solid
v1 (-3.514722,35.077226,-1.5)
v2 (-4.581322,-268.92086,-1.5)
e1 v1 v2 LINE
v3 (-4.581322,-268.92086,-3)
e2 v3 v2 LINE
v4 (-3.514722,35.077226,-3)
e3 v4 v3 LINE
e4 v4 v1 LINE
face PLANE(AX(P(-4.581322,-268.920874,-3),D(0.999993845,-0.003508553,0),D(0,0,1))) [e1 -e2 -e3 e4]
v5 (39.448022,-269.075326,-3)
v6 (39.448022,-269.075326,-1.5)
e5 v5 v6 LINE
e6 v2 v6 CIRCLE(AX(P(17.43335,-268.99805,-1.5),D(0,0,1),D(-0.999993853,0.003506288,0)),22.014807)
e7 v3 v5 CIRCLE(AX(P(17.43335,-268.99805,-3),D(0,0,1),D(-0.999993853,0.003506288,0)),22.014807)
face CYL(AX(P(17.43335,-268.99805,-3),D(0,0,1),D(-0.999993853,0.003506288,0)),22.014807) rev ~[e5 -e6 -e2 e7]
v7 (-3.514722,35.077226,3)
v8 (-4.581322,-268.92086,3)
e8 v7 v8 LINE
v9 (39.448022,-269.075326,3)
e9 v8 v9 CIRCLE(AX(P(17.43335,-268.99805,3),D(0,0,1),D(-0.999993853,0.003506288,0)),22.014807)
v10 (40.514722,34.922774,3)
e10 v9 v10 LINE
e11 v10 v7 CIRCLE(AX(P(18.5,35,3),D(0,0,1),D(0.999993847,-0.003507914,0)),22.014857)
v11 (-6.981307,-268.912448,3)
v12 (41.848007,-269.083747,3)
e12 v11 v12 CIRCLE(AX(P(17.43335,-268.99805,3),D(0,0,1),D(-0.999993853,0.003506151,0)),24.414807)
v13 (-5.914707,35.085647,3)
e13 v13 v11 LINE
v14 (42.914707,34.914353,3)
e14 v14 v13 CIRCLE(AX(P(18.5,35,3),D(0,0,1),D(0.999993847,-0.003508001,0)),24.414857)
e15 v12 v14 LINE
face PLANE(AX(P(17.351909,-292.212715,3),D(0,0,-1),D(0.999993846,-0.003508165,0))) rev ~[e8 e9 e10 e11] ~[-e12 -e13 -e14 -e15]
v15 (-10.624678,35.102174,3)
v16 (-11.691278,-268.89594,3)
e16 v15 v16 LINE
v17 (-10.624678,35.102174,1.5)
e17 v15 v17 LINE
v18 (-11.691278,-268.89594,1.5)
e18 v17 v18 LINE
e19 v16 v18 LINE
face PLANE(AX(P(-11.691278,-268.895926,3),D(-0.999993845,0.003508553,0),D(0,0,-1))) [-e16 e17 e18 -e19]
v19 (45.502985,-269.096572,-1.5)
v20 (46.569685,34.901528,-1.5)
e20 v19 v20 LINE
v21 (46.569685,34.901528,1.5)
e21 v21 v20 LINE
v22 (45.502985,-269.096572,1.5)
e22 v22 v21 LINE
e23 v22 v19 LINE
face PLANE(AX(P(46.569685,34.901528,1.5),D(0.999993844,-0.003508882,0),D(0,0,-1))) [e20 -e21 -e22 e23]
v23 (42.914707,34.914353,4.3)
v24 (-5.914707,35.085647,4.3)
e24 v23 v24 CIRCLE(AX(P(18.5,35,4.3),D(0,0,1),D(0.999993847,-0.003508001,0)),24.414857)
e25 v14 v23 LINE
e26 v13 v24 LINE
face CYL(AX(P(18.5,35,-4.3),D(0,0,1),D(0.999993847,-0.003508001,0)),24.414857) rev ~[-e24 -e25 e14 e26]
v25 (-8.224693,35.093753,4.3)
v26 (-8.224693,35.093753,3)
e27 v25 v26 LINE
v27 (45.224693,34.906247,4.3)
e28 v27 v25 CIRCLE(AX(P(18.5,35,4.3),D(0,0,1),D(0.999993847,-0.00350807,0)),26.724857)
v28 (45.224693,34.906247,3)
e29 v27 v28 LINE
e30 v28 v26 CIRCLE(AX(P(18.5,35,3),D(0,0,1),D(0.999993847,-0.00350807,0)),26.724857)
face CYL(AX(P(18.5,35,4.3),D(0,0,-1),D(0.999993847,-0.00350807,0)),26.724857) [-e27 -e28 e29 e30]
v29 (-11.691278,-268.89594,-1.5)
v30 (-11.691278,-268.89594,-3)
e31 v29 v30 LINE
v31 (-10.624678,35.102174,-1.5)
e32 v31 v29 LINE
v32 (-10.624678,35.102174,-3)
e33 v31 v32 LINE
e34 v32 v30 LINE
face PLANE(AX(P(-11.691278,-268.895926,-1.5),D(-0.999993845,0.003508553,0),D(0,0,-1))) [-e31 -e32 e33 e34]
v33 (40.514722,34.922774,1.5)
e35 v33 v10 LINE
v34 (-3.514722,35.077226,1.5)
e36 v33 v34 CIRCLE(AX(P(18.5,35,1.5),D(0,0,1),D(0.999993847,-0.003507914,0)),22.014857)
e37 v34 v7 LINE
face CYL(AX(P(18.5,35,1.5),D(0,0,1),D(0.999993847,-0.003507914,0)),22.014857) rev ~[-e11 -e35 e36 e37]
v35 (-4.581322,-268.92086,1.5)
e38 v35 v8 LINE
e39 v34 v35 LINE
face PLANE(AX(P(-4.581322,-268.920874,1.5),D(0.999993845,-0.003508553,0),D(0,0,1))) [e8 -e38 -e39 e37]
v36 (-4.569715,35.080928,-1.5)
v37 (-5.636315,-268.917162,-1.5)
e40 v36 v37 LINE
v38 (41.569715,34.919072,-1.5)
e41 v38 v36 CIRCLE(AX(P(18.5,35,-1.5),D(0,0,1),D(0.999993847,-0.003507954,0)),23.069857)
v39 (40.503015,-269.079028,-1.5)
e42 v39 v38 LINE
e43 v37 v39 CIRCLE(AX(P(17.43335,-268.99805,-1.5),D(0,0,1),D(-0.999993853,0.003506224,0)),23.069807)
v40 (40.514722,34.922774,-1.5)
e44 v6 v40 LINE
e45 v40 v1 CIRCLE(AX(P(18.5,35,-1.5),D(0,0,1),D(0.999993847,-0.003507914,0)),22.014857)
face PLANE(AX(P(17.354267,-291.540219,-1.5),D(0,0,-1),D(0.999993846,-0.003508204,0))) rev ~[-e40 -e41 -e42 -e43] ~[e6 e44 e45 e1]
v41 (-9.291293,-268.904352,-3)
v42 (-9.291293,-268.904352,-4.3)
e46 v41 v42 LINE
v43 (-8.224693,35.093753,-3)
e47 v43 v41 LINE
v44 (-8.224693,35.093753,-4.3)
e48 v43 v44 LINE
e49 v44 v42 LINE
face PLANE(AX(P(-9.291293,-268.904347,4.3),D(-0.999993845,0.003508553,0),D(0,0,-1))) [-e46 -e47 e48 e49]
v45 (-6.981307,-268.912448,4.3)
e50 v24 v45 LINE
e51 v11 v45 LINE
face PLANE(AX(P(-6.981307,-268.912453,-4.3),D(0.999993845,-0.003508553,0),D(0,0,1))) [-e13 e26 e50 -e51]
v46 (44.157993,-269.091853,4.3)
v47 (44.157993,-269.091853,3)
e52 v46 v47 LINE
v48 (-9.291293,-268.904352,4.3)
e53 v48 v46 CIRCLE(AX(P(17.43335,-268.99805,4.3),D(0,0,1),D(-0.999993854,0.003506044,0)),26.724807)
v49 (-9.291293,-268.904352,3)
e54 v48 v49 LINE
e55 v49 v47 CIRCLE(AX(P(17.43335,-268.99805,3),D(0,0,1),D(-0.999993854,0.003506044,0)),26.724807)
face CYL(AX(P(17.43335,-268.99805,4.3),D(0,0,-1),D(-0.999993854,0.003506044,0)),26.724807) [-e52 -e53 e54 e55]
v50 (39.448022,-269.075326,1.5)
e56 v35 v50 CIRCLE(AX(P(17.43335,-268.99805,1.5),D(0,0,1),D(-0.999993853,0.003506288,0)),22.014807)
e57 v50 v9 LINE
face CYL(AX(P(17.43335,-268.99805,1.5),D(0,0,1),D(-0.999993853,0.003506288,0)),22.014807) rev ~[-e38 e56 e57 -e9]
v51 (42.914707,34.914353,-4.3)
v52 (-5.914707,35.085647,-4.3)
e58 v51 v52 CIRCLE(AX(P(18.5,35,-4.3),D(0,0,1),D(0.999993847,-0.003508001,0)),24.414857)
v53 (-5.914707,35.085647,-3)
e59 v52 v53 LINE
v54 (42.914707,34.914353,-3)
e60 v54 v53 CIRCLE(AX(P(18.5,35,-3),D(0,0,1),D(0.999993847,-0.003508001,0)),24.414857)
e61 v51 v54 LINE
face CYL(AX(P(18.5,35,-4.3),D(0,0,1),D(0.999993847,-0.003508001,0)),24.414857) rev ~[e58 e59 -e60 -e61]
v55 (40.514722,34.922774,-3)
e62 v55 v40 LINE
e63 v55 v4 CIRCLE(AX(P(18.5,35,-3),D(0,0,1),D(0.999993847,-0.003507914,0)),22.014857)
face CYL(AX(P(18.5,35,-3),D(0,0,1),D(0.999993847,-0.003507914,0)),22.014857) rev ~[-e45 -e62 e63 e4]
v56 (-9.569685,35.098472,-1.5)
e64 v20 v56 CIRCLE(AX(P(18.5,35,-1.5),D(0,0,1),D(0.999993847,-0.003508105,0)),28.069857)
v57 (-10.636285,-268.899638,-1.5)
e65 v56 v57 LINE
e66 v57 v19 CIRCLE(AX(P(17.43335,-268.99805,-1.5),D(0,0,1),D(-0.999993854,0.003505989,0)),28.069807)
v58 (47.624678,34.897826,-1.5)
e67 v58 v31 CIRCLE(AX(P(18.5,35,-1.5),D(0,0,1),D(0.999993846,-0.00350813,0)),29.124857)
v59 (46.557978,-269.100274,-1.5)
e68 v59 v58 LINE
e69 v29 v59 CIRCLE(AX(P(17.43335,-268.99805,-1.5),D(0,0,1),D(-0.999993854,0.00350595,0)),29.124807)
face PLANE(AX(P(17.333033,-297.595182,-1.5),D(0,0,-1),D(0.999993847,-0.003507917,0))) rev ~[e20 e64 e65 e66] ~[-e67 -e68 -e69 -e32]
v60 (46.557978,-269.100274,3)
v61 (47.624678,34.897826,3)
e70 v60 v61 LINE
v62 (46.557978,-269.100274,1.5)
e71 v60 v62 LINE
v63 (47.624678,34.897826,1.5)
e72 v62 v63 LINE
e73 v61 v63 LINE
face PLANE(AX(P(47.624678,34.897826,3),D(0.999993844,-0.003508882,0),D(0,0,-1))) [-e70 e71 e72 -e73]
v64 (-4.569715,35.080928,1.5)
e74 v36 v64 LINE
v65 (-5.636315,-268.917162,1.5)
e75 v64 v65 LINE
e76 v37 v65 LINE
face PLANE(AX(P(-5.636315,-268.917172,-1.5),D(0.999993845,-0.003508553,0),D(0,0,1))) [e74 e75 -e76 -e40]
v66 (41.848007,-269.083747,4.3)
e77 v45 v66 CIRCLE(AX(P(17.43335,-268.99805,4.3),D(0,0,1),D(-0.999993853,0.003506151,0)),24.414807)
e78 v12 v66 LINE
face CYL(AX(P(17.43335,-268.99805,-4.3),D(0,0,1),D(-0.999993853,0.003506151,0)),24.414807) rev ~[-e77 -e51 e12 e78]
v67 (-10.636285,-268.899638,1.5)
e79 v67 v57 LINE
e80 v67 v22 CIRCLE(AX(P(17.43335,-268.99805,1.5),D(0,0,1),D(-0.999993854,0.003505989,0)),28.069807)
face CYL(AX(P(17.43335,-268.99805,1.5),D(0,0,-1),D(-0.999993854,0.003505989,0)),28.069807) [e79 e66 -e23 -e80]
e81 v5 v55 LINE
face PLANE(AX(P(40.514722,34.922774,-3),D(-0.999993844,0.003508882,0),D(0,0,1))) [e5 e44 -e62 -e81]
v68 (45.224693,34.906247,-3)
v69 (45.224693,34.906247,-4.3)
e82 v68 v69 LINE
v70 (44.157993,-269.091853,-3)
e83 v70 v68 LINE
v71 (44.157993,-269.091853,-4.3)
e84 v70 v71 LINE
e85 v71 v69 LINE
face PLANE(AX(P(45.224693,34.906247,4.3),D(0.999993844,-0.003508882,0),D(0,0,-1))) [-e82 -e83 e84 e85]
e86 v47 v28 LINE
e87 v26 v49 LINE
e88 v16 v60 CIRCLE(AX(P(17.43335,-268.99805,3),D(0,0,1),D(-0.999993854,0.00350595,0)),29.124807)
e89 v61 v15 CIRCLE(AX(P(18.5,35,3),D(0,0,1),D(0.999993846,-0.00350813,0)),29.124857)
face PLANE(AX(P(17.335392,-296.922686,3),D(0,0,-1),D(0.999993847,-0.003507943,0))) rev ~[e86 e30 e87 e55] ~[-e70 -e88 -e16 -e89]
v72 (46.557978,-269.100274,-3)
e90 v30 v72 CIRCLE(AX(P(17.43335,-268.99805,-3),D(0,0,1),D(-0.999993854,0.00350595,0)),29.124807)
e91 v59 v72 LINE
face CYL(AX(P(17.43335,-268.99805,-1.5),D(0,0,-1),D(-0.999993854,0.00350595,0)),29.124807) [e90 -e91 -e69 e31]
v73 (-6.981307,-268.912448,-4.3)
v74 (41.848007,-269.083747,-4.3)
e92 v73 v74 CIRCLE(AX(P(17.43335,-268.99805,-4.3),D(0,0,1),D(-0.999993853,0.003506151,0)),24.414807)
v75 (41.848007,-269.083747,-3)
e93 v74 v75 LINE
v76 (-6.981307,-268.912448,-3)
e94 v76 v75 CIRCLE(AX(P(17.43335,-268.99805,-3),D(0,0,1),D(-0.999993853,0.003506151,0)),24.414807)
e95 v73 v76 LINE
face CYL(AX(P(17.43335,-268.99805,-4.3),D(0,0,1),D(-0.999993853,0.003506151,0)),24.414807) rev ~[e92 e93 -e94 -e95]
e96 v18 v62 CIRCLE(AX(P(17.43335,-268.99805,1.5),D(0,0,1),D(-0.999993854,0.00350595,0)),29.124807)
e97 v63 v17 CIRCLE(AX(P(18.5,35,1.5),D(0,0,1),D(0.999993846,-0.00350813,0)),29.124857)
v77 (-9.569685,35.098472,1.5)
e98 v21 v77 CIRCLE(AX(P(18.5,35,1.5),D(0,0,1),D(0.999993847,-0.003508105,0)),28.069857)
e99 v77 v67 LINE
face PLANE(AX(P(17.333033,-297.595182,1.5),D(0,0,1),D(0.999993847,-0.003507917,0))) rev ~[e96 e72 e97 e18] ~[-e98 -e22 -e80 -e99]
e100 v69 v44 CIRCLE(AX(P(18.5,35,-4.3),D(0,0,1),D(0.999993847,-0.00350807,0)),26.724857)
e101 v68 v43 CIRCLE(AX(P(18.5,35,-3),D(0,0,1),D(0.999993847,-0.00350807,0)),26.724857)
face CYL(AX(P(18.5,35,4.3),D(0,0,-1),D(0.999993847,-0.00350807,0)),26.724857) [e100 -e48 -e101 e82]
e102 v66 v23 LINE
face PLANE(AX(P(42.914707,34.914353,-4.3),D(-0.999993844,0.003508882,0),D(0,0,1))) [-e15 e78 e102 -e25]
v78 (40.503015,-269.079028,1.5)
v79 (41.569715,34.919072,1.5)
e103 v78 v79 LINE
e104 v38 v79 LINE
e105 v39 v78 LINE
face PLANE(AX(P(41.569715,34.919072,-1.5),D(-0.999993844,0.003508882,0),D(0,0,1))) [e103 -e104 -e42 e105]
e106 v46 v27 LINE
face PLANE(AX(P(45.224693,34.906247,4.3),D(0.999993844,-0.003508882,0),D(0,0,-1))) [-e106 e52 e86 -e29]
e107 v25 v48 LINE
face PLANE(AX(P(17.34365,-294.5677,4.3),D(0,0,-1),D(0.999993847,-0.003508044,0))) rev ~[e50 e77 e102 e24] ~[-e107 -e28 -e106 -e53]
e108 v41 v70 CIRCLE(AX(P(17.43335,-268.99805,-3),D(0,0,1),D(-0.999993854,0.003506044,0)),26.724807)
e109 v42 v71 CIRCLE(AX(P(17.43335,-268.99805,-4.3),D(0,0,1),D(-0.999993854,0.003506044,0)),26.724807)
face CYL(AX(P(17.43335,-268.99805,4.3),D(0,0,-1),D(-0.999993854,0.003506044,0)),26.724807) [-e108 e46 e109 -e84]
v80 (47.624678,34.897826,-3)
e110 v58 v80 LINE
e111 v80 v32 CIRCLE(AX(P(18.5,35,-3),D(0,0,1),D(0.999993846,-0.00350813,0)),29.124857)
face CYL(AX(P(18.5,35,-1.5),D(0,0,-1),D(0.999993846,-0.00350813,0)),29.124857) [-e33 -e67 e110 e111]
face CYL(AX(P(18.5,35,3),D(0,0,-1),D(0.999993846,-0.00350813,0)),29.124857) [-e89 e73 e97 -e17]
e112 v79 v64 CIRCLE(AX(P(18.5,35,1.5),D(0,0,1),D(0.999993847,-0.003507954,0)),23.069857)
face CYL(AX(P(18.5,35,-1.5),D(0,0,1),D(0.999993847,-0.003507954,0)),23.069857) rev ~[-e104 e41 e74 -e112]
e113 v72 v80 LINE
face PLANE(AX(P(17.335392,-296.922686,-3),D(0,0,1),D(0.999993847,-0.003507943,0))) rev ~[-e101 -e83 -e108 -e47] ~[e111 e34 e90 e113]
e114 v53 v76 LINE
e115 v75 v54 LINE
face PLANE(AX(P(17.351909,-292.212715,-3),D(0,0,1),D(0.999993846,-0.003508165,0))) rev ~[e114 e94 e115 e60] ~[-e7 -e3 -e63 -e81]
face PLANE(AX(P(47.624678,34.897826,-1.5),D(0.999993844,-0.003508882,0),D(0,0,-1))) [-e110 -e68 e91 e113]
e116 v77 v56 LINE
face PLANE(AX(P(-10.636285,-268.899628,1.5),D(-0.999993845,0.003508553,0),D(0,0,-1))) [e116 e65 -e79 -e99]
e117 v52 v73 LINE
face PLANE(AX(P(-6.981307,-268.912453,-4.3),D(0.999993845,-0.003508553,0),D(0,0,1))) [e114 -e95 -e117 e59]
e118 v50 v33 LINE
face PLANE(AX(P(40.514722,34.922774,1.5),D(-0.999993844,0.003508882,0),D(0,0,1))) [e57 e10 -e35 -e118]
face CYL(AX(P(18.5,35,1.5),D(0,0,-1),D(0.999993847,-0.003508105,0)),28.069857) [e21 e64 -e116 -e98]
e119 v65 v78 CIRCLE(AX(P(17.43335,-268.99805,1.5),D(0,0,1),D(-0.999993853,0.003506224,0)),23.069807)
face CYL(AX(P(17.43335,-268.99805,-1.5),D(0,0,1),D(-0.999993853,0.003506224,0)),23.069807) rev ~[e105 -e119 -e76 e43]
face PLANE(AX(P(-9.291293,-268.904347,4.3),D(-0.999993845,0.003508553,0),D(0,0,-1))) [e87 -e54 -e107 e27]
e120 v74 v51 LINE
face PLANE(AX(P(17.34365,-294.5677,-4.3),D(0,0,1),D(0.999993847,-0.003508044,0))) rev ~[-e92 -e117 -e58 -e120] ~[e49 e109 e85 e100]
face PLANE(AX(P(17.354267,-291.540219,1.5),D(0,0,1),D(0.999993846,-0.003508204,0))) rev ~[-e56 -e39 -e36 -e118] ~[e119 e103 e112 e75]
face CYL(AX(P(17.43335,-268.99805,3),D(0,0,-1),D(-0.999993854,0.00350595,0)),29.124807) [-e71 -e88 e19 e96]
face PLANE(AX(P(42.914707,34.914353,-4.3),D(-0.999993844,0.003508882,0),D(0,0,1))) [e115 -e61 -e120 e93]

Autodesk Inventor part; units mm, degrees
ref_plane "Work Plane2" through (18.5, 35, 0) normal (-1, 0, 0) x (0, 0, 1)
ref_plane "Work Plane3" through (17.4333, -268.9981, 0) normal (0.309017, 0.9510565, 0) x (0, 0, 1)
sketch "Path" plane through (0, 0, 0) normal (0, 0, 1) x (1, 0, 0)
  arc A0 (44.0697, 34.9103) -> (-7.0697, 35.0897) centre (18.5, 35) ccw
  arc A1 (-8.1363, -268.9084) -> (43.003, -269.0878) centre (17.4333, -268.9981) ccw
  line L0 (-8.1363, -268.9084) -> (-7.0697, 35.0897)
  line L1 (44.0697, 34.9103) -> (43.003, -269.0878)
  dimension "d31" = 7.11
ref_plane "Section Plane" through (-7.0697, 35.0897, 0) normal (-0.0035088, -0.9999938, 0) x (0, 0, 1)
sketch "Section Sketch" plane through (-7.0697, 35.0897, 0) normal (-0.0035088, -0.9999938, 0) x (0, 0, 1)
  line L0 (-4.3, -1.155) -> (4.3, -1.155)
  line L1 (4.3, -1.155) -> (4.3, 1.155)
  line L2 (4.3, 1.155) -> (-4.3, 1.155)
  line L3 (-4.3, 1.155) -> (-4.3, -1.155)
  line L4 (-1.5, -2.5) -> (1.5, -2.5)
  line L5 (1.5, -2.5) -> (1.5, 2.5)
  line L6 (1.5, 2.5) -> (-1.5, 2.5)
  line L7 (-1.5, 2.5) -> (-1.5, -2.5)
  line L8 (-1.5, 0) -> (1.5, 0) construction
  line L9 (-3, -3.555) -> (-1.5, -3.555)
  line L10 (-1.5, -3.555) -> (-1.5, 3.555)
  line L11 (-1.5, 3.555) -> (-3, 3.555)
  line L12 (-3, 3.555) -> (-3, -3.555)
  line L13 (1.5, -3.555) -> (3, -3.555)
  line L14 (3, -3.555) -> (3, 3.555)
  line L15 (3, 3.555) -> (1.5, 3.555)
  line L16 (1.5, 3.555) -> (1.5, -3.555)
  line L17 (-4.3, 0) -> (4.3, 0) construction
  point P0 (0, 0)
  point P1 (0, 0)
  dimension "d21" = 2.31
  dimension "d22" = 5
  dimension "d23" = 3
  dimension "d24" = 1.5
  dimension "d31" = 7.11
  dimension "d32" = 8.6
sweep "Solid" add profiles "Section Sketch" path "Path"
pattern_of_one "Strand Pattern"
equation "\"d21\" = da_d2"
equation "\"d22\" = da_d1"
equation "\"d23\" = da_b1"
equation "\"d24\" = da_t1 + da_t2"
equation "\"d30\" = da_pt"
equation "\"da_p\" = 8"
equation "\"da_b1\" = 3"
equation "\"da_h2\" = 7.11"
equation "\"da_h3\" = 7.11"
equation "\"da_d1\" = 5"
equation "\"da_d2\" = 2.31"
equation "\"da_pt\" = 5.64"
equation "\"da_b\" = 8.6"
equation "\"da_t1\" = 0.75"
equation "\"da_t2\" = 0.75"
properties part number "Roller Chain"
